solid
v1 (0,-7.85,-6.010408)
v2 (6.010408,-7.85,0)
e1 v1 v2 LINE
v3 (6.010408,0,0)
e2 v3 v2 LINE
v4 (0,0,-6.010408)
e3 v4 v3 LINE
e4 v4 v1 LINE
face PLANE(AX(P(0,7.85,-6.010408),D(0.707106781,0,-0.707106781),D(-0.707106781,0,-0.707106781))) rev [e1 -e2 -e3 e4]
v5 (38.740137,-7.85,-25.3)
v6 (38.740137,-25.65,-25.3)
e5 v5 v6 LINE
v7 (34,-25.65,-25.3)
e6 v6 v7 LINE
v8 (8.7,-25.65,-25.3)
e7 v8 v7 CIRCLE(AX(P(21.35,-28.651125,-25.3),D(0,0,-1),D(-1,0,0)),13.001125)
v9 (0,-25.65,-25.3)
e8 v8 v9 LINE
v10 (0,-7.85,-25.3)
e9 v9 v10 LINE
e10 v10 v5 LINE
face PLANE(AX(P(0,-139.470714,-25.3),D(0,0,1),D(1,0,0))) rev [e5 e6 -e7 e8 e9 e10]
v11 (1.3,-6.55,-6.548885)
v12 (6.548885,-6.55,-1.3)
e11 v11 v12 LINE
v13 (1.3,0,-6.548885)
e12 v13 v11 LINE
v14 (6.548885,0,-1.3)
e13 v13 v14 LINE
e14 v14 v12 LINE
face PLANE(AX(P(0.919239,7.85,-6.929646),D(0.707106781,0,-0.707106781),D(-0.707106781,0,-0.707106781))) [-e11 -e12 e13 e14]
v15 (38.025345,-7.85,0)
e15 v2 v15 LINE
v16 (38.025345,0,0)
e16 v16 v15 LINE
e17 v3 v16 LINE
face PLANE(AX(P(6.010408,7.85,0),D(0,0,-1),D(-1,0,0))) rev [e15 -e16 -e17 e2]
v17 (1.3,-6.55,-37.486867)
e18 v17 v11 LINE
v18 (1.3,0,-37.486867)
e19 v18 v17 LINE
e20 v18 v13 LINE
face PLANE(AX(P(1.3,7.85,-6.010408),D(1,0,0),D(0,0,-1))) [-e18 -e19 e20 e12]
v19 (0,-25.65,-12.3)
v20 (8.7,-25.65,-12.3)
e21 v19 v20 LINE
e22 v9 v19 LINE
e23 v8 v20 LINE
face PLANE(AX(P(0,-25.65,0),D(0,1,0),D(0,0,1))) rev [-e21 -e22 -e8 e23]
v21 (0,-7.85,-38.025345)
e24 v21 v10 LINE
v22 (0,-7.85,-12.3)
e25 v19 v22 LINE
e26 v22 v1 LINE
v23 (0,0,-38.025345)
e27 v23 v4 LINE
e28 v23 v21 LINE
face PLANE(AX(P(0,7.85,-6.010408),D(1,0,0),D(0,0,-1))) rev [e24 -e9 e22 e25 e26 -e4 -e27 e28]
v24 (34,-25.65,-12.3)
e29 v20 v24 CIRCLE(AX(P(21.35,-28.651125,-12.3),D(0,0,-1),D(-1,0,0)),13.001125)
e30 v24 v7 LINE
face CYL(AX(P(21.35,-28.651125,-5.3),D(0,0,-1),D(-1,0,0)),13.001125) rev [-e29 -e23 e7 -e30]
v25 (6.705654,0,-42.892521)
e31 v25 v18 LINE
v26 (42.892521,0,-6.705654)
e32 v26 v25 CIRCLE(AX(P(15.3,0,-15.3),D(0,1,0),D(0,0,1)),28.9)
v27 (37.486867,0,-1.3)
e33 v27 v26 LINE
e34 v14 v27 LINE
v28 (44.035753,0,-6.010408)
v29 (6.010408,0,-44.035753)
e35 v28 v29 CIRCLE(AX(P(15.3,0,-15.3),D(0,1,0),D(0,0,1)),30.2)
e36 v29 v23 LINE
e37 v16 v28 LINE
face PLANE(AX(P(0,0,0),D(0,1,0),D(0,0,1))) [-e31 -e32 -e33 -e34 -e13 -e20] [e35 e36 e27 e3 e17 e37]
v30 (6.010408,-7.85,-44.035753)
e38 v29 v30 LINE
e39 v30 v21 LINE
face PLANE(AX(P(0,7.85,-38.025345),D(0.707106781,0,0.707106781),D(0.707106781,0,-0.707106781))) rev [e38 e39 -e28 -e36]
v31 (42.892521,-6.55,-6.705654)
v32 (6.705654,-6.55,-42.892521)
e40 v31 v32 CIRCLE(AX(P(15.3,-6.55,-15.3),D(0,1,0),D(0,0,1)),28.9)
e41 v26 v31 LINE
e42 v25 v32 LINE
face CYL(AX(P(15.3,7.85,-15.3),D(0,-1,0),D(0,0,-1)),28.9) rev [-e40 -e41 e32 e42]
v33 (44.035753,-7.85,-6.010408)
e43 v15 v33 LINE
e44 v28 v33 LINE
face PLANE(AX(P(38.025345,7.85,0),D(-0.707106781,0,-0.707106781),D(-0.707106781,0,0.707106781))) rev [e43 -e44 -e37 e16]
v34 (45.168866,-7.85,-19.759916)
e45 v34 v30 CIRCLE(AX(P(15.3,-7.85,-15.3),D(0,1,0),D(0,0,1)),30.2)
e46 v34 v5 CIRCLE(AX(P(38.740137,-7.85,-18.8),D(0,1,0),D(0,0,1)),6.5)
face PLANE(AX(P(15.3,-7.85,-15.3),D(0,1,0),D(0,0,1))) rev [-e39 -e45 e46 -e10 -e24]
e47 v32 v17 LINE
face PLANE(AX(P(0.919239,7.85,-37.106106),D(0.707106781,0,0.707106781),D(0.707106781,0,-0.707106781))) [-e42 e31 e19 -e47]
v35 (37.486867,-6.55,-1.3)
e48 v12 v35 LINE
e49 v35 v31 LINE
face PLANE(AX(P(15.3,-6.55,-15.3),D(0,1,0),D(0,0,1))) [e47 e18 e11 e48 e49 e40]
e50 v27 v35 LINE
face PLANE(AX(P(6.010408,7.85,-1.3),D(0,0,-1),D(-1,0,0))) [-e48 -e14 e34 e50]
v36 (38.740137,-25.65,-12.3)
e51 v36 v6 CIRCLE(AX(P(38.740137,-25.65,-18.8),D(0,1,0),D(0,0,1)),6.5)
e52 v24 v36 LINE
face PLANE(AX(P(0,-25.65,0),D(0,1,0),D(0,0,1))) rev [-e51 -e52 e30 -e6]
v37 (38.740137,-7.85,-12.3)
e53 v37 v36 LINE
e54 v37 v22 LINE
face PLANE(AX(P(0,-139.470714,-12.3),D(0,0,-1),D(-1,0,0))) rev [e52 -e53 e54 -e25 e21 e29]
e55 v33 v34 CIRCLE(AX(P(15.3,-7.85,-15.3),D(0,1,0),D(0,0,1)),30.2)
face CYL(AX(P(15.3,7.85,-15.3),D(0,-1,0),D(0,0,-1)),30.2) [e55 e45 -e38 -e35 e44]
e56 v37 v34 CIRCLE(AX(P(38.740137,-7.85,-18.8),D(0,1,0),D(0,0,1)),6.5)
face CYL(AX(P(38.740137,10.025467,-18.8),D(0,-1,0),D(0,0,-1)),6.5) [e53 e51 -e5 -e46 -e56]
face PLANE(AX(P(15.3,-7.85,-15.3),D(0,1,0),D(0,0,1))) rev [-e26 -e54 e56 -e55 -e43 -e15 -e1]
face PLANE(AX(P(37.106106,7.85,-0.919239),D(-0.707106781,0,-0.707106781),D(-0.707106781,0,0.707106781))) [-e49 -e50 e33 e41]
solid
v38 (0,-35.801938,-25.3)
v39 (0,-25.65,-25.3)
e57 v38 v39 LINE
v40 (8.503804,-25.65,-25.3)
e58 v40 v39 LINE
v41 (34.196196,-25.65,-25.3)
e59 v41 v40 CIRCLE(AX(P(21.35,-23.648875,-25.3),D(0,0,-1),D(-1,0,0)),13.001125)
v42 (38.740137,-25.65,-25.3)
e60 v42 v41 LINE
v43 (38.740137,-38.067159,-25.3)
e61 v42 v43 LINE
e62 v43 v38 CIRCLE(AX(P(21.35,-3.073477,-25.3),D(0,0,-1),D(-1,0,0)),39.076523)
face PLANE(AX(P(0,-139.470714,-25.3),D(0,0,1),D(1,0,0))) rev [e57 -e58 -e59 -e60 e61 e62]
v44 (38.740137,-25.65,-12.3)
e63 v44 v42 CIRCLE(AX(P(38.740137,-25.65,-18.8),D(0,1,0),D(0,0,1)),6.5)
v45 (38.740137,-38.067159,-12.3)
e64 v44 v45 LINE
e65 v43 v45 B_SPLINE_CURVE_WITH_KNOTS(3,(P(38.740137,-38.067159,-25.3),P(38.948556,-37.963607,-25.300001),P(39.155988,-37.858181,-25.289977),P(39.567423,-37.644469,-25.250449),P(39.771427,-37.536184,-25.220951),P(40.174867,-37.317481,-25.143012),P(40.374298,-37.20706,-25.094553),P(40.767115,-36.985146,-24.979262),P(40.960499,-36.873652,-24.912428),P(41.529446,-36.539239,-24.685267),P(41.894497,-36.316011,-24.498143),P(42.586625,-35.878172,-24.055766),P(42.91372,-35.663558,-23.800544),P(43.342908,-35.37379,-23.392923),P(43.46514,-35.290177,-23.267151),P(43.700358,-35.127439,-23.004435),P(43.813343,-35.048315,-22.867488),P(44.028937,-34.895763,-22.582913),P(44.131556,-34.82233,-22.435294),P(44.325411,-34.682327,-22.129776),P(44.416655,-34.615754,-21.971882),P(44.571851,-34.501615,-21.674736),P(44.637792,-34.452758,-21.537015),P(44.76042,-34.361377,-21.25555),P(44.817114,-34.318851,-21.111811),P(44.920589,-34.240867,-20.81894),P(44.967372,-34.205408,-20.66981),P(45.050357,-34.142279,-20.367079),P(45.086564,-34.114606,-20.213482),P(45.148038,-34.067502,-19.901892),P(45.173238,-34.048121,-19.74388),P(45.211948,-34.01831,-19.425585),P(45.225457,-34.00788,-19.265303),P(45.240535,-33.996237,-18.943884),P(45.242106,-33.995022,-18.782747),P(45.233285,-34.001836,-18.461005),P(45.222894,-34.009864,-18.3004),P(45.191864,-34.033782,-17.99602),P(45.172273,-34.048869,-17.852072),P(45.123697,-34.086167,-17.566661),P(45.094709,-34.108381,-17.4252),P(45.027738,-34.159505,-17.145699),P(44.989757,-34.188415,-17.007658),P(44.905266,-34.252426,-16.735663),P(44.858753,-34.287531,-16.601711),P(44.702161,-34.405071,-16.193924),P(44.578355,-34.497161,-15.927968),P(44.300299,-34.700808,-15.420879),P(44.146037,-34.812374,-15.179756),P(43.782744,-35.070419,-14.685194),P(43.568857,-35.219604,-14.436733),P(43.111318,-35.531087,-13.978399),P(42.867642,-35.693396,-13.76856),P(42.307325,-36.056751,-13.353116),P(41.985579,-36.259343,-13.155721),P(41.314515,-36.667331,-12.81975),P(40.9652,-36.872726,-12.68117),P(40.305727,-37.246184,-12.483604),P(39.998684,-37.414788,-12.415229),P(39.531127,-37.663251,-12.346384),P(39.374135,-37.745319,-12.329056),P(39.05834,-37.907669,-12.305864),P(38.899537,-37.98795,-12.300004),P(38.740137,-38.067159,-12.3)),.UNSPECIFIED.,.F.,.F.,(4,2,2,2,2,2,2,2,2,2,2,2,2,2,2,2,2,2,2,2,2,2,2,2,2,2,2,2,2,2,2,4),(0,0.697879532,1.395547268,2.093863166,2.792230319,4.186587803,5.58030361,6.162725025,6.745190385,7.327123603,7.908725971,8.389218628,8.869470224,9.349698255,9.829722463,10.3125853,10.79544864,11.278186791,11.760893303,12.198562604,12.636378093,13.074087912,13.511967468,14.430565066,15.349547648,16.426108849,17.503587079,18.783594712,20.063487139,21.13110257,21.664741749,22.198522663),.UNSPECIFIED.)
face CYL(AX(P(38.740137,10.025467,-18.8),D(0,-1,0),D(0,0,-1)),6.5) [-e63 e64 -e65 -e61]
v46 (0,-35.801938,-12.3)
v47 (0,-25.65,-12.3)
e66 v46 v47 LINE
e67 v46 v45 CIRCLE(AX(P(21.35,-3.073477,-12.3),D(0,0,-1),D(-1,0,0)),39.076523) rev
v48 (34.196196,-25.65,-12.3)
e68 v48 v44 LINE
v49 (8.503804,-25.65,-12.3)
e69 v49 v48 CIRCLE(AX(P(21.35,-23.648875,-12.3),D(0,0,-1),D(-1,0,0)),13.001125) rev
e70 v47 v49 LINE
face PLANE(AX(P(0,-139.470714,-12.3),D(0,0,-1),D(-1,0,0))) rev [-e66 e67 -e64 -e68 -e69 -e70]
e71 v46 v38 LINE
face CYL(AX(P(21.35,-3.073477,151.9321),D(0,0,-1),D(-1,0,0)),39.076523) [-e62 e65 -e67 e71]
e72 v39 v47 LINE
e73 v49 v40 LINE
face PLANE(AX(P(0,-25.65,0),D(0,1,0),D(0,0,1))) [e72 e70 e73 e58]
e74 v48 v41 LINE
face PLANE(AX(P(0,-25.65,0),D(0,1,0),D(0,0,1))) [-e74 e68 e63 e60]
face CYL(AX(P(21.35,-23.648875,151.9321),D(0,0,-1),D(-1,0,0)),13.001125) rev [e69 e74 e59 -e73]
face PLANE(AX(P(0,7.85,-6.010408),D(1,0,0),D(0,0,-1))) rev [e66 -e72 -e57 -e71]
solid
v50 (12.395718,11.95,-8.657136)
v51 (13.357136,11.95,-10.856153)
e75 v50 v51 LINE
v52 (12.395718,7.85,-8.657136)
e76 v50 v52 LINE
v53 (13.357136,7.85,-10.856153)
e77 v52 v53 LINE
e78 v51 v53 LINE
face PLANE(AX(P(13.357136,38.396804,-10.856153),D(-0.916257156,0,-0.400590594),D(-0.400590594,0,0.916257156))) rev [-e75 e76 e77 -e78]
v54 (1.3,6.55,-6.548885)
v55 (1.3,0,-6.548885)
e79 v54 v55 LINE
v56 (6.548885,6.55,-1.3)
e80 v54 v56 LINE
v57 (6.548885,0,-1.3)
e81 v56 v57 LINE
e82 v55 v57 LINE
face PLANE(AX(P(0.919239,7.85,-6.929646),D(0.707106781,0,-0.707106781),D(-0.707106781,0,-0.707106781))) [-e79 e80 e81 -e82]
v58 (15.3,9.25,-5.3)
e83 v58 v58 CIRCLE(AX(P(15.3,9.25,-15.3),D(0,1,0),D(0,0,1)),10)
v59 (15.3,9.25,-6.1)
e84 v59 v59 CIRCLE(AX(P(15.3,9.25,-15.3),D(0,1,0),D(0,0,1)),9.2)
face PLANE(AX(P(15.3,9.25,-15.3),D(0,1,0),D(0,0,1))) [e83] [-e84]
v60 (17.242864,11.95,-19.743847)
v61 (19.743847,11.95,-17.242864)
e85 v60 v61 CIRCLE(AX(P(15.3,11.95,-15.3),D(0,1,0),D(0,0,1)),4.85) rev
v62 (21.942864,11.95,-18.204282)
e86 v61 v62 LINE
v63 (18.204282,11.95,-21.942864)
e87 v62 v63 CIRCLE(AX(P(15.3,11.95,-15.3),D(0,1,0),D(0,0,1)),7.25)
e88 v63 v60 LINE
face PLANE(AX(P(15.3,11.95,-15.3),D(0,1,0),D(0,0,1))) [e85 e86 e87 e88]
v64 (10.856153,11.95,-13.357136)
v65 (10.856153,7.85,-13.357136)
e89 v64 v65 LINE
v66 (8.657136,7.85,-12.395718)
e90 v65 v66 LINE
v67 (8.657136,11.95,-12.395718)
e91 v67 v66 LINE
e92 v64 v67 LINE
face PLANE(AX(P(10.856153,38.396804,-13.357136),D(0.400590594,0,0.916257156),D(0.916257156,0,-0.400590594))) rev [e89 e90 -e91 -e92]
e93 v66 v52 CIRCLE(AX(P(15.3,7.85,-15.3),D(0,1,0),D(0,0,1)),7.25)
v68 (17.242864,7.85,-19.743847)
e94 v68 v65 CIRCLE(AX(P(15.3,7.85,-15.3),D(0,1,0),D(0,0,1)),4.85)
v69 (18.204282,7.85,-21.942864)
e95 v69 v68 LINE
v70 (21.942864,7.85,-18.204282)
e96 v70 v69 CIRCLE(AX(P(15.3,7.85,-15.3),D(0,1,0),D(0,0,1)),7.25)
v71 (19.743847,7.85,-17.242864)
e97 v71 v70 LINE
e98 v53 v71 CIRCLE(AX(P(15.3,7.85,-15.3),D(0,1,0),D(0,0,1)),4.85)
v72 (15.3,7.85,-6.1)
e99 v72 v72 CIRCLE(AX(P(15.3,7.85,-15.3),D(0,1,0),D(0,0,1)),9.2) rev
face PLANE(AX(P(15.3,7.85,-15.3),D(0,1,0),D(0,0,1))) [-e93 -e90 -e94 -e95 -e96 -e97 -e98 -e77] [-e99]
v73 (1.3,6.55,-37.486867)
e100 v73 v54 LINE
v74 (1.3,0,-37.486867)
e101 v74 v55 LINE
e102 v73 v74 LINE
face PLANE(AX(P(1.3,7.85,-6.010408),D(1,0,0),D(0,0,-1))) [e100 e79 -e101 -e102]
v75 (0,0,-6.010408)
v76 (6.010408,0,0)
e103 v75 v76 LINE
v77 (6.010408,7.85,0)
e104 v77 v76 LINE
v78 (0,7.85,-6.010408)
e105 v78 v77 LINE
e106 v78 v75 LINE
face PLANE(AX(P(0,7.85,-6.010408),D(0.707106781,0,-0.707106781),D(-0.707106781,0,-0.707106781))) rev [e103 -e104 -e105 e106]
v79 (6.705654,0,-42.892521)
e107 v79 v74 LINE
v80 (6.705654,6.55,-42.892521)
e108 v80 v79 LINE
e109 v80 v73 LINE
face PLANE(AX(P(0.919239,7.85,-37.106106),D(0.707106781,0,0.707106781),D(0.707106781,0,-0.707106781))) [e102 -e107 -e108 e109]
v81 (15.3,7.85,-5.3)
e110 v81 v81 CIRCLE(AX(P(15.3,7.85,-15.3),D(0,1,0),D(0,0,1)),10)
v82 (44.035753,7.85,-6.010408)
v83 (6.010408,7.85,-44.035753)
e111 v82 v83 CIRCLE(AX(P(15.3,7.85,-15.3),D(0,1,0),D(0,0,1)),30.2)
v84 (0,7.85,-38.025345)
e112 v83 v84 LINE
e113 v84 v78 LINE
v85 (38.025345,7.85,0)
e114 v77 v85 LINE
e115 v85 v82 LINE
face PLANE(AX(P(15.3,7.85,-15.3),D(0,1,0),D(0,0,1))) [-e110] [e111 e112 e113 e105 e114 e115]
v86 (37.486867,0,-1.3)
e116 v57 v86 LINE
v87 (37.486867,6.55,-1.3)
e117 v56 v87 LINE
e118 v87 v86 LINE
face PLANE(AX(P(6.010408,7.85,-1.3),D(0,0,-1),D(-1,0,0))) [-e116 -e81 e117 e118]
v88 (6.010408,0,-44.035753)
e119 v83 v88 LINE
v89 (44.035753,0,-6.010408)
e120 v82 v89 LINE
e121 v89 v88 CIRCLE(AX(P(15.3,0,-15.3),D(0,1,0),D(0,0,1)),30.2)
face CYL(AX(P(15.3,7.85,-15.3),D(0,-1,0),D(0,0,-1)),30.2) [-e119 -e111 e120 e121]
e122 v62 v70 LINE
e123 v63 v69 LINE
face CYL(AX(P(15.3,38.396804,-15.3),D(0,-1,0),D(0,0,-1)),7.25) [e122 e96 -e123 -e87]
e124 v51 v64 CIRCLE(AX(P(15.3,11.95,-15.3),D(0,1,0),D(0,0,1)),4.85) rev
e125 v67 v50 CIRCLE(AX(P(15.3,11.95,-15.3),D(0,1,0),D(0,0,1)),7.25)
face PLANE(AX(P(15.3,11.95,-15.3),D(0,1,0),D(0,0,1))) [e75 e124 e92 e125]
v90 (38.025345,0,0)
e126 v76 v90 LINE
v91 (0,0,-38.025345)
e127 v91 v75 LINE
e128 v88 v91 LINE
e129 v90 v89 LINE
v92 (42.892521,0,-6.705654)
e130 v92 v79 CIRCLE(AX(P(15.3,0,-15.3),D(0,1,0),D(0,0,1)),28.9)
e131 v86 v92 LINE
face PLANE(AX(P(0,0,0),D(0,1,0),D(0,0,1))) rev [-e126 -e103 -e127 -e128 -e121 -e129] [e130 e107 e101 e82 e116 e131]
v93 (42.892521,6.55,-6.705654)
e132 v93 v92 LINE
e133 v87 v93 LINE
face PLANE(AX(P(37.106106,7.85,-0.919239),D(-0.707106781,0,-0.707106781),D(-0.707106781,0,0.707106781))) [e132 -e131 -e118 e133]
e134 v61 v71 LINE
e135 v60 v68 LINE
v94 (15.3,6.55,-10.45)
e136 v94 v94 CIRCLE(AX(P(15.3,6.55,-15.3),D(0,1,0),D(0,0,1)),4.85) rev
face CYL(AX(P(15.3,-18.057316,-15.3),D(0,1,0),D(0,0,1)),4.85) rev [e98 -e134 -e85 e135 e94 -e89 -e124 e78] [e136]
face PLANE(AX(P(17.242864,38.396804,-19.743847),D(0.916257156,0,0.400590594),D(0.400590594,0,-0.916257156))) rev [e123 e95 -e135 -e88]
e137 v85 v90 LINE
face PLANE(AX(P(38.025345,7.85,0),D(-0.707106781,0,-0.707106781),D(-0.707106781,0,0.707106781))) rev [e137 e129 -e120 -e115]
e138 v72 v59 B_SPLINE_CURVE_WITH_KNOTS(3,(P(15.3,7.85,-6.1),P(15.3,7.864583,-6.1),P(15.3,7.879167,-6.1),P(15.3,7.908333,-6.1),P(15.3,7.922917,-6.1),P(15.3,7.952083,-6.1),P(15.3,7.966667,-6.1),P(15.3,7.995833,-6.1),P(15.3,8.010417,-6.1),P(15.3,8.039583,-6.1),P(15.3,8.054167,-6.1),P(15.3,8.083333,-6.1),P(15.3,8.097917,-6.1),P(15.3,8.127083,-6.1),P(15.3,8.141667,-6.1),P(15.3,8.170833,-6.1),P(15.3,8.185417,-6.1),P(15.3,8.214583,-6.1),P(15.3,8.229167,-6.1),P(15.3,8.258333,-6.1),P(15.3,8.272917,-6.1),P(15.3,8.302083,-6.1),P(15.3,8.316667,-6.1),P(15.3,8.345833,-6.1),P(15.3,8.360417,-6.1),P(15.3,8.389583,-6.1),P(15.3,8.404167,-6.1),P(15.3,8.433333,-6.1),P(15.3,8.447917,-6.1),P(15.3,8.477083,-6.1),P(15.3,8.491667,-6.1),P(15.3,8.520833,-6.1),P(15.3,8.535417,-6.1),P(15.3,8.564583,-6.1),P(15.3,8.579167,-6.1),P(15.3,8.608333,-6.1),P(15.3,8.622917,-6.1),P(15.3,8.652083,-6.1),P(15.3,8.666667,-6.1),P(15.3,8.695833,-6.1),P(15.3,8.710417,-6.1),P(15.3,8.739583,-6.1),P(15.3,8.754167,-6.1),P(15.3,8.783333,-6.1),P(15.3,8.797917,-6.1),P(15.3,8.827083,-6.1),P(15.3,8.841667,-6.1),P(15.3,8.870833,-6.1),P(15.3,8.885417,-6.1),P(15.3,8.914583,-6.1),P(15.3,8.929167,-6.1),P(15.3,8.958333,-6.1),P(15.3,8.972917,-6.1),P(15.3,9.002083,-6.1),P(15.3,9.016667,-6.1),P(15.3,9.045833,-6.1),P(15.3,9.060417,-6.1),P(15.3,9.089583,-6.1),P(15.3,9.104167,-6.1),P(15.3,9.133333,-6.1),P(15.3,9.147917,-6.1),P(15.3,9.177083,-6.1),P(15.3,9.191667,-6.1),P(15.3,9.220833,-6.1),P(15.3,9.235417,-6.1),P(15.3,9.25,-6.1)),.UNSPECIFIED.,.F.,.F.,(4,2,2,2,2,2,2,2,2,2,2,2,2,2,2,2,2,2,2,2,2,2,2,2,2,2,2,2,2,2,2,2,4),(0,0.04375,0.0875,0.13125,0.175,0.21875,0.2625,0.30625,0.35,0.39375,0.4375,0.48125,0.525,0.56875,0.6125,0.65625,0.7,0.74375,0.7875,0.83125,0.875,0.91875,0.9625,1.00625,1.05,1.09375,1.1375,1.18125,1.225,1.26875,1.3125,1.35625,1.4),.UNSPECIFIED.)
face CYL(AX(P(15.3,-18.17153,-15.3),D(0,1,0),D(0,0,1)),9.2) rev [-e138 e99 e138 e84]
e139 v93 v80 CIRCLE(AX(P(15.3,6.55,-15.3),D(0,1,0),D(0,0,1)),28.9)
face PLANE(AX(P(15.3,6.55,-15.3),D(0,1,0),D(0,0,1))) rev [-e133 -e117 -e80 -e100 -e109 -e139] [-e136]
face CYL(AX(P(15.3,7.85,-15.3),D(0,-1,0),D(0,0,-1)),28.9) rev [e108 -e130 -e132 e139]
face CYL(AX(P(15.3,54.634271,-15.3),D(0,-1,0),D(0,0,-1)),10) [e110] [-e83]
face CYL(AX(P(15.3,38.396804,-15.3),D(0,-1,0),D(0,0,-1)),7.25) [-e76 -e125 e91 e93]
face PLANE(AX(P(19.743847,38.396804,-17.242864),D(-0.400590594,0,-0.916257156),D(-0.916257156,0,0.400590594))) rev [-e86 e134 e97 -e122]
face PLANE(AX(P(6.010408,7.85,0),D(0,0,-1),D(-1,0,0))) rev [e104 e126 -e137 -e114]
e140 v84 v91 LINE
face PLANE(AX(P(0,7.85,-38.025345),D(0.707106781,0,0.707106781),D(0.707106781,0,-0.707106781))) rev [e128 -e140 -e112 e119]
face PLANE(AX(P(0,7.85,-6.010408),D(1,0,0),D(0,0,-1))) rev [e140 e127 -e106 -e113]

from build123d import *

# Parameters (mm, degrees)
RESSALTO_EXTRUS_O1_DEPTH = 7.85
ESBO_O3_R                = 10
RESSALTO_EXTRUS_O2_DEPTH = 1.4
CASCA1_T                 = -1.3
CASCA2_T                 = -1.3
ESBO_O4_R                = 4.85
CORTE_EXTRUS_O1_DEPTH    = 67.580102133
ESBO_O5_R                = 9.2
CORTE_EXTRUS_O2_DEPTH    = 1.4
RESSALTO_EXTRUS_O5_START = -1.3
ESBO_O7_R                = 8.7
ESBO_O7_R_2              = 4.85
RESSALTO_EXTRUS_O5_DEPTH = 1.3
RESSALTO_EXTRUS_O3_DEPTH = 4.1
RESSALTO_EXTRUS_O6_DEPTH = 34.3
CORTE_EXTRUS_O4_DEPTH    = 34.3
ESBO_O10_R               = 13.001125
CORTE_EXTRUS_O3_DEPTH    = 20
ESBO_O12_R               = 58.064815878
ESBO_O12_R_2             = 39.076522869
ESBO_O12_R_3             = 13.001125
CORTE_EXTRUS_O5_DEPTH    = 13


# Read off the part's stored shape, not the designer's step: Dividir2
with BuildPart() as part:
    # Esboço1 → Ressalto-extrusão1 (new, symmetric)
    with BuildSketch(Plane(origin=(0, 0, 0), x_dir=(1, 0, 0), z_dir=(0, 1, 0))):
        with BuildLine():
            Line((0, 6.01040764), (6.01040764, 0))
            Line((6.01040764, 0), (38.025344896, 0))
            Line((38.025344896, 0), (44.035752536, 6.01040764))
            ThreePointArc((44.035752536, 6.01040764), (36.654624792, 36.654624792), (6.01040764, 44.035752536))
            Line((6.01040764, 44.035752536), (0, 38.025344896))
            Line((0, 38.025344896), (0, 6.01040764))
        make_face()
    extrude(amount=RESSALTO_EXTRUS_O1_DEPTH, both=True)

    # Esboço3 → Ressalto-extrusão2 (add)
    with BuildSketch(Plane(origin=(0, 7.85, 0), x_dir=(1, 0, 0), z_dir=(0, 1, 0))):
        with Locations(Location((15.3, 15.3, 0), (0, 0, 270))):
            Circle(ESBO_O3_R)
    extrude(amount=RESSALTO_EXTRUS_O2_DEPTH)


with BuildPart() as body_2:
    # Dividir1: the piece on the far side of the plane
    add(part.part)
    split(bisect_by=Plane.ZX, keep=Keep.BOTTOM)

    # Casca1
    casca1_openings = [body_2.faces().sort_by_distance(p)[0] for p in [
        (21.196466448, 0, -21.196466448),
    ]]
    offset(amount=CASCA1_T, openings=casca1_openings, kind=Kind.INTERSECTION)

    # Esboço8 → Ressalto-extrusão6 (add)
    with BuildSketch(Plane.XZ.offset(7.85)):
        with BuildLine():
            Line((0, -12.3), (45.350623954, -12.3))
            ThreePointArc((45.350623954, -12.3), (45.286430787, -18.885243179), (43.796315551, -25.3))
            Line((43.796315551, -25.3), (0, -25.3))
            Line((0, -25.3), (0, -12.3))
        make_face()
    extrude(amount=RESSALTO_EXTRUS_O6_DEPTH)

    # Esboço11 → Corte-extrusão4 (cut)
    with BuildSketch(Plane.XZ.offset(42.15)):
        with BuildLine():
            Line((38.740136518, -12.3), (51.009297324, -12.3))
            Line((51.009297324, -12.3), (51.009297324, -25.3))
            Line((51.009297324, -25.3), (38.740136518, -25.3))
            ThreePointArc((38.740136518, -25.3), (45.240136518, -18.8), (38.740136518, -12.3))
        make_face()
    extrude(amount=-CORTE_EXTRUS_O4_DEPTH, mode=Mode.SUBTRACT)


with BuildPart() as part_1:
    add(part.part)

    # Dividir1
    split(bisect_by=Plane.ZX, keep=Keep.TOP)

    # Casca2
    casca2_openings = [part_1.faces().sort_by_distance(p)[0] for p in [
        (21.196466448, 0, -21.196466448),
    ]]
    offset(amount=CASCA2_T, openings=casca2_openings, kind=Kind.INTERSECTION)

    # Esboço4 → Corte-extrusão1 (cut, through all)
    with BuildSketch(Plane(origin=(0, 9.25, 0), x_dir=(1, 0, 0), z_dir=(0, 1, 0))):
        with Locations(Location((15.3, 15.3, 0), (0, 0, 270))):
            Circle(ESBO_O4_R)
    extrude(amount=-CORTE_EXTRUS_O1_DEPTH, mode=Mode.SUBTRACT)

    # Esboço5 → Corte-extrusão2 (cut)
    with BuildSketch(Plane(origin=(0, 9.25, 0), x_dir=(1, 0, 0), z_dir=(0, 1, 0))):
        with Locations(Location((15.3, 15.3, 0), (0, 0, 270))):
            Circle(ESBO_O5_R)
    extrude(amount=-CORTE_EXTRUS_O2_DEPTH, mode=Mode.SUBTRACT)

    # Esboço7 → Ressalto-extrusão5 (add)
    with BuildSketch(Plane(origin=(0, 7.85, 0), x_dir=(1, 0, 0), z_dir=(0, 1, 0)).offset(RESSALTO_EXTRUS_O5_START)):
        with Locations((15.3, 15.3)):
            Circle(ESBO_O7_R)
        with Locations(Location((15.3, 15.3, 0), (0, 0, 270))):
            Circle(ESBO_O7_R_2, mode=Mode.SUBTRACT)
    extrude(amount=RESSALTO_EXTRUS_O5_DEPTH)

    # Esboço6 → Ressalto-extrusão3 (add)
    with BuildSketch(Plane(origin=(0, 7.85, 0), x_dir=(1, 0, 0), z_dir=(0, 1, 0))):
        with BuildLine():
            Line((10.856152793, 13.357135619), (8.657135619, 12.395718193))
            ThreePointArc((8.657135619, 12.395718193), (10.173475836, 10.173475836), (12.395718193, 8.657135619))
            Line((12.395718193, 8.657135619), (13.357135619, 10.856152793))
            ThreePointArc((13.357135619, 10.856152793), (11.870532111, 11.870532111), (10.856152793, 13.357135619))
        make_face()
        with BuildLine():
            Line((17.242864381, 19.743847207), (18.204281807, 21.942864381))
            ThreePointArc((18.204281807, 21.942864381), (20.426524164, 20.426524164), (21.942864381, 18.204281807))
            Line((21.942864381, 18.204281807), (19.743847207, 17.242864381))
            ThreePointArc((19.743847207, 17.242864381), (18.729467889, 18.729467889), (17.242864381, 19.743847207))
        make_face()
    extrude(amount=RESSALTO_EXTRUS_O3_DEPTH)


with BuildPart() as body_3:
    # Dividir2: the piece on the far side of the plane
    add(body_2.part)
    split(bisect_by=Plane(origin=(0, -25.65, 0), x_dir=(1, 0, 0), z_dir=(0, 1, 0)), keep=Keep.BOTTOM)

    # Esboço12 → Corte-extrusão5 (cut)
    # profile 1 of 2: a face of its own
    with BuildSketch(Plane(origin=(0, 0, -25.3), x_dir=(-1, 0, 0), z_dir=(0, 0, -1))):
        with Locations((-21.35, -3.073477131)):
            Circle(ESBO_O12_R)
        with Locations((-21.35, -3.073477131)):
            Circle(ESBO_O12_R_2, mode=Mode.SUBTRACT)
    # profile 2 of 2: a face of its own
    with BuildSketch(Plane(origin=(0, 0, -25.3), x_dir=(-1, 0, 0), z_dir=(0, 0, -1))):
        with Locations((-21.35, -23.648875)):
            Circle(ESBO_O12_R_3)
    extrude(amount=-CORTE_EXTRUS_O5_DEPTH, mode=Mode.SUBTRACT)


with BuildPart() as body_2_1:
    add(body_2.part)

    # Dividir2
    split(bisect_by=Plane(origin=(0, -25.65, 0), x_dir=(1, 0, 0), z_dir=(0, 1, 0)), keep=Keep.TOP)

    # Esboço10 → Corte-extrusão3 (cut)
    with BuildSketch(Plane(origin=(0, 0, -25.3), x_dir=(-1, 0, 0), z_dir=(0, 0, -1))):
        with Locations((-21.35, -28.651125)):
            Circle(ESBO_O10_R)
    extrude(amount=-CORTE_EXTRUS_O3_DEPTH, mode=Mode.SUBTRACT)


solid = Compound([part_1.part, body_3.part, body_2_1.part])
